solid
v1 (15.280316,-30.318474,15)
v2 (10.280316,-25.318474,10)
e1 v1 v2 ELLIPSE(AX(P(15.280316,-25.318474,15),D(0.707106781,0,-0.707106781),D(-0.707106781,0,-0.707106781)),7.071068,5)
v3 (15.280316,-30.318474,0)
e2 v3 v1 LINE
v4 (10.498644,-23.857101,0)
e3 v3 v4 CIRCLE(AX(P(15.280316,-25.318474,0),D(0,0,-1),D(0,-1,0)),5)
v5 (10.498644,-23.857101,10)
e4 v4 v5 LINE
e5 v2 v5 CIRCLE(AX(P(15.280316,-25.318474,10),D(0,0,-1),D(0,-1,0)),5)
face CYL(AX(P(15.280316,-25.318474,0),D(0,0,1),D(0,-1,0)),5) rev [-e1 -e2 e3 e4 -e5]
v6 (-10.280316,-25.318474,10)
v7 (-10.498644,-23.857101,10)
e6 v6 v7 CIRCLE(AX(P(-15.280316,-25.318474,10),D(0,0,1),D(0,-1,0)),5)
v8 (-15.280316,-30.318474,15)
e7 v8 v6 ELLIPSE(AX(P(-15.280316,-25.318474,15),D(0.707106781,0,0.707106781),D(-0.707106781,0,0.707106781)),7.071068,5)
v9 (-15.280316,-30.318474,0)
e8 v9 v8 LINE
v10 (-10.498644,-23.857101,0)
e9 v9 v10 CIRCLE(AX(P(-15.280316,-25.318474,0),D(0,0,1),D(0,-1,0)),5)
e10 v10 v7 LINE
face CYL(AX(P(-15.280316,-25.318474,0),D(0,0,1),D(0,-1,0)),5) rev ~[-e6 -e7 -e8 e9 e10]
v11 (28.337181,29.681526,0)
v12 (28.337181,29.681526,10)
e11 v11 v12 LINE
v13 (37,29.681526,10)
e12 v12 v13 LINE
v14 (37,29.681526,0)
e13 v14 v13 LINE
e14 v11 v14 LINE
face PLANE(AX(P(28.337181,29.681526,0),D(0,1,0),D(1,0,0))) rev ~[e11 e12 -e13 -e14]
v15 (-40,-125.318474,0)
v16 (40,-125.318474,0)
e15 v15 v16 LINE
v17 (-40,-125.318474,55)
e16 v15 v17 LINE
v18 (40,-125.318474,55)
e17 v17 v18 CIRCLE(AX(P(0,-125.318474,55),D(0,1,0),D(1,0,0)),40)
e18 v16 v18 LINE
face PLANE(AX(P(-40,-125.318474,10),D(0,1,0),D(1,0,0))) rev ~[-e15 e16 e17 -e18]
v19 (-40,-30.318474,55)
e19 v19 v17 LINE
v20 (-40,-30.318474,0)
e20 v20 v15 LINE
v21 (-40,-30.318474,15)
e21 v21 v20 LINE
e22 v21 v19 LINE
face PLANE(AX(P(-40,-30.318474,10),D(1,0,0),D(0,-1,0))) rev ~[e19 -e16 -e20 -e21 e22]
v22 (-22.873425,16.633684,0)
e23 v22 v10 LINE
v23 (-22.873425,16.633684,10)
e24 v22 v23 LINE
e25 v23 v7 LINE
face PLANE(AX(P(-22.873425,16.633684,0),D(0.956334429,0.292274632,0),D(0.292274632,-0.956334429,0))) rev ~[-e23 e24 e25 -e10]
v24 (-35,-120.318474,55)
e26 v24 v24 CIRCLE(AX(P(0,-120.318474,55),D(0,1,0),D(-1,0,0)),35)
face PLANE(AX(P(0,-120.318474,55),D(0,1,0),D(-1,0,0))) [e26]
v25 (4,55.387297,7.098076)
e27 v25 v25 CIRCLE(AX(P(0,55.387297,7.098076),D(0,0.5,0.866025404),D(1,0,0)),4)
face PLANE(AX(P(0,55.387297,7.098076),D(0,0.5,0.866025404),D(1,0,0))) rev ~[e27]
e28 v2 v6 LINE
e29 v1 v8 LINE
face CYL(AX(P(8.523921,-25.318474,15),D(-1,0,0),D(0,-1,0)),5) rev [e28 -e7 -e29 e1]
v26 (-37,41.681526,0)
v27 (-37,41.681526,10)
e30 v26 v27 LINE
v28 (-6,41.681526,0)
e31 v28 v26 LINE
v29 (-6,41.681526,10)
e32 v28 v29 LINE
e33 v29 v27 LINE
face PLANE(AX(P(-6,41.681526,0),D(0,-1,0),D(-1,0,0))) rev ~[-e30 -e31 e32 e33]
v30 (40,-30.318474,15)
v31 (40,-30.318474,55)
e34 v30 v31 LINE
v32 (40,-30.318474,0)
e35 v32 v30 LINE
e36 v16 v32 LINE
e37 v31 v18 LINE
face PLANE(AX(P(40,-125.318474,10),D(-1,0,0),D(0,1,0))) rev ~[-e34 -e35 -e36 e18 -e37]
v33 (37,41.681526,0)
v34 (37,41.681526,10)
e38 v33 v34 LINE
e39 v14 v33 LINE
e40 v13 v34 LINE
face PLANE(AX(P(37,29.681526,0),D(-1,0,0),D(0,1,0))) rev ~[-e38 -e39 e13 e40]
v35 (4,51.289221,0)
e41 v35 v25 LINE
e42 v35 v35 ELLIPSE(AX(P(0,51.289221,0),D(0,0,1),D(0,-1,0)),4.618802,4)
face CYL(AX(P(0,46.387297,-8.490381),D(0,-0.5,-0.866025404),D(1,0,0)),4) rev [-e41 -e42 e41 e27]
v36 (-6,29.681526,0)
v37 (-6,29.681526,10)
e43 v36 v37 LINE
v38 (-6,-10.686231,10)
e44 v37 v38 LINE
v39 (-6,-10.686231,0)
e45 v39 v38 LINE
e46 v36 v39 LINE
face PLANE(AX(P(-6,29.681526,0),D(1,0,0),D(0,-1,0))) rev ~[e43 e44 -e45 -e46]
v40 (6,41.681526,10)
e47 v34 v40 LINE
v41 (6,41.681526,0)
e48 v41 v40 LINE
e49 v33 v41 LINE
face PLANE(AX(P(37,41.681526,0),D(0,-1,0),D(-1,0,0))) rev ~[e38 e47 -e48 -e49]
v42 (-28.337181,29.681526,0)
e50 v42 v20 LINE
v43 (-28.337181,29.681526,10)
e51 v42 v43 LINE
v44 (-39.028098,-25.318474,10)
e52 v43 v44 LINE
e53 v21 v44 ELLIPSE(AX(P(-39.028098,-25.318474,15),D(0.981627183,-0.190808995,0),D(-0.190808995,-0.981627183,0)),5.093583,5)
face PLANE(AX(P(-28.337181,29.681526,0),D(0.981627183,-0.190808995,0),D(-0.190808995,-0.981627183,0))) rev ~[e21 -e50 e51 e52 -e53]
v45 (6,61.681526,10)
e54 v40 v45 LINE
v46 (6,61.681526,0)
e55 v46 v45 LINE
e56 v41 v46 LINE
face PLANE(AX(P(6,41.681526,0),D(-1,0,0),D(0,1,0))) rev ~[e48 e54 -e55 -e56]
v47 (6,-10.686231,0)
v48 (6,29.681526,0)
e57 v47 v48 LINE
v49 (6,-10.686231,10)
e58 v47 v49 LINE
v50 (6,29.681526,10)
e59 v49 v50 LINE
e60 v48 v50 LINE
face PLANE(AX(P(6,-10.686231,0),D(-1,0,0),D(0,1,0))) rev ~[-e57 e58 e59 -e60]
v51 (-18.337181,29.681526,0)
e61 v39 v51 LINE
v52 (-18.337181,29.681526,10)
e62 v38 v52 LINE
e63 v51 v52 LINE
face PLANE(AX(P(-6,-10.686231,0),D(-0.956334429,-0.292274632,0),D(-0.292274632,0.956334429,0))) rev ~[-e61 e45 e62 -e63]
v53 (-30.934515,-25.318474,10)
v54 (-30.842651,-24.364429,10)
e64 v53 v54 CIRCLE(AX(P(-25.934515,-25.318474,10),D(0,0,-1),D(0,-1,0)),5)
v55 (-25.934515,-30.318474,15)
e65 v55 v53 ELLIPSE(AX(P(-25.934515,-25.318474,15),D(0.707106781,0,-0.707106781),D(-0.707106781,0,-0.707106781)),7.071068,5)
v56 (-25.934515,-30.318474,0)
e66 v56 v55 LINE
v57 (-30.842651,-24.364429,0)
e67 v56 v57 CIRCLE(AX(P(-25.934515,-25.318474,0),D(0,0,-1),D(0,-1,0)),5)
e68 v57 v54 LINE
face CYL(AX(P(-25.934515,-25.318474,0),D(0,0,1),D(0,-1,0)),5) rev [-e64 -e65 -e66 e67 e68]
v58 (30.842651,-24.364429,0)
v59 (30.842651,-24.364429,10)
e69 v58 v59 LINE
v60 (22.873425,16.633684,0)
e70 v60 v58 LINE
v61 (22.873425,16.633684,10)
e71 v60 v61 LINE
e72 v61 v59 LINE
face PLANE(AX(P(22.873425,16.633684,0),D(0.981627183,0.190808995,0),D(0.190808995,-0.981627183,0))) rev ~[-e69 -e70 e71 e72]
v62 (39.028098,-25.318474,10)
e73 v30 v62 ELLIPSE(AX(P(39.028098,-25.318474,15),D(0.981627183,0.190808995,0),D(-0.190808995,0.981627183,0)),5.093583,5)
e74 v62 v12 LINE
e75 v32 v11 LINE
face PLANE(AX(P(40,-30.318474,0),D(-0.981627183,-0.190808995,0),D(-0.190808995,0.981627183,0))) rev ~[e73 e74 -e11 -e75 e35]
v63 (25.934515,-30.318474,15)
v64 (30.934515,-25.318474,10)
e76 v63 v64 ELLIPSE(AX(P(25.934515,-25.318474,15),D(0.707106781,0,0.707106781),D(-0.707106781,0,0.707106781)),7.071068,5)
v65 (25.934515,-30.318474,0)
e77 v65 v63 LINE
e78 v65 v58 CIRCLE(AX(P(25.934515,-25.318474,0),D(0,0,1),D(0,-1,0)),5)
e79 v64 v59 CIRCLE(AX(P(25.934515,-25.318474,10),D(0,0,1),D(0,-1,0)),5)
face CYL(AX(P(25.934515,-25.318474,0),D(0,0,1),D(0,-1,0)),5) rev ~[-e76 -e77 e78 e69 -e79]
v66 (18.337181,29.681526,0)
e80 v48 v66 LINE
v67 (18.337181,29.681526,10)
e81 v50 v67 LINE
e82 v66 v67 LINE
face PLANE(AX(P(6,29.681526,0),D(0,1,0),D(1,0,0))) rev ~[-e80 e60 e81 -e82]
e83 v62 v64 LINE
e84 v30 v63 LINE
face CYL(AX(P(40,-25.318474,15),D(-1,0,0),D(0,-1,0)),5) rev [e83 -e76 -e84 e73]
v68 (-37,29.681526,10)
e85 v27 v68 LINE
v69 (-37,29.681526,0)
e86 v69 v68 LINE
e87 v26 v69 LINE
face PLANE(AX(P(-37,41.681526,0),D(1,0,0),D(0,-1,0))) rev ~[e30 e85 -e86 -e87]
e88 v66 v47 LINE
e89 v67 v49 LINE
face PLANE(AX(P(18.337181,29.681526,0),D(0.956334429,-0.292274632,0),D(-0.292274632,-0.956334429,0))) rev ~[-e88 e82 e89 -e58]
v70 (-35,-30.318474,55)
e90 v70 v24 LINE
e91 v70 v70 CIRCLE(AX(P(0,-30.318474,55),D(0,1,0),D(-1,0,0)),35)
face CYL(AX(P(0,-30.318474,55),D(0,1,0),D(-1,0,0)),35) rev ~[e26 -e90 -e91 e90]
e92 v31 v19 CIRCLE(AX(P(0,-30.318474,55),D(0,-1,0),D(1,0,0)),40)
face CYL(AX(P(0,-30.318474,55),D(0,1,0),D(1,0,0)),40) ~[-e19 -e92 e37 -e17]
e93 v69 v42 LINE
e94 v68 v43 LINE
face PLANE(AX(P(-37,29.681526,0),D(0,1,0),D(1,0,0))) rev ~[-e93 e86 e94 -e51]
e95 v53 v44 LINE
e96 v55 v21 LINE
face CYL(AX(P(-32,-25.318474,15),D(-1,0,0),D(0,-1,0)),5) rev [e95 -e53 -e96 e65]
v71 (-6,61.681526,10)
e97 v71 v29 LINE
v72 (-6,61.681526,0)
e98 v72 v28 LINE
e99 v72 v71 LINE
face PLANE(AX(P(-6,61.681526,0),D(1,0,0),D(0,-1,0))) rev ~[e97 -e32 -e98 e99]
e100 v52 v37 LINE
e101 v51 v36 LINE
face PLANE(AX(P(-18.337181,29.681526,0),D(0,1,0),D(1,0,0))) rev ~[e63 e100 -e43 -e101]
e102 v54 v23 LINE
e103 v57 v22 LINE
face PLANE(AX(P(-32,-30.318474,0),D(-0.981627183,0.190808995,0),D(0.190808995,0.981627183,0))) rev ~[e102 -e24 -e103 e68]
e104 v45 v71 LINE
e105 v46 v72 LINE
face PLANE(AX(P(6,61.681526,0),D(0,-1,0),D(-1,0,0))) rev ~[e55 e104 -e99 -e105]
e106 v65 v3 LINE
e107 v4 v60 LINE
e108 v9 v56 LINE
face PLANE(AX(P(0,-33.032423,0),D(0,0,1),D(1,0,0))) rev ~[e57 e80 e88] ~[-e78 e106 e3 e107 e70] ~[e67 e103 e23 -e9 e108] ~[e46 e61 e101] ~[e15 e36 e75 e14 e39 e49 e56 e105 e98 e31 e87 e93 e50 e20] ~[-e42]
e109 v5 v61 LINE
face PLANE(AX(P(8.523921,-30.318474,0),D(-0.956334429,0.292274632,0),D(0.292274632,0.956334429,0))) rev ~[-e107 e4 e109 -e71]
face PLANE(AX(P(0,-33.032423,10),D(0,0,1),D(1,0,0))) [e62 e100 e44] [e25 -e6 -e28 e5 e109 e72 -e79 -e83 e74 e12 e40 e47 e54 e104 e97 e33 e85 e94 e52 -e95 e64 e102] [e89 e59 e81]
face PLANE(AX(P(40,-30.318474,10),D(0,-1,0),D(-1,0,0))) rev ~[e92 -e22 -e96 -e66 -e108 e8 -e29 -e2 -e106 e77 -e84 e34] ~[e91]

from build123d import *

# Parameters (mm, degrees)
F1_DEPTH  = 10
F3_DEPTH  = 100
F4_R      = 35
F5_DEPTH  = 90
F6_DEPTH  = 95.001
F7_R      = 5
F10_R     = 4
F11_DEPTH = 18


with BuildPart() as f1:
    # F0 (on Top) → F1 (new body)
    with BuildSketch(Plane.XY):
        Polygon((-6, 61.6815258077), (-6, 41.6815258077), (-37, 41.6815258077), (-37, 29.6815258077), (-28.3371814517, 29.6815258077), (-40, -30.3184741923), (-40, -125.3184741923), (0, -125.3184741923), (40, -125.3184741923), (40, -30.3184741923), (28.3371814517, 29.6815258077), (37, 29.6815258077), (37, 41.6815258077), (6, 41.6815258077), (6, 61.6815258077), (0, 61.6815258077), align=None)
        Polygon((-8.5239209836, -30.3184741923), (-32, -30.3184741923), (-22.8734250069, 16.6336838404), align=None, mode=Mode.SUBTRACT)
        Polygon((-18.3371814517, 29.6815258077), (-6, 29.6815258077), (-6, -10.686231312), align=None, mode=Mode.SUBTRACT)
        Polygon((6, -10.686231312), (6, 29.6815258077), (18.3371814517, 29.6815258077), align=None, mode=Mode.SUBTRACT)
        Polygon((22.8734250069, 16.6336838404), (32, -30.3184741923), (8.5239209836, -30.3184741923), align=None, mode=Mode.SUBTRACT)
    extrude(amount=F1_DEPTH)

    # F2 (on face) → F3 (join)
    with BuildSketch(Plane.XY.offset(10)):
        Polygon((-8.5239209836, -30.3184741923), (-40, -30.3184741923), (-40, -125.3184741923), (40, -125.3184741923), (40, -30.3184741923), (8.5239209836, -30.3184741923), align=None)
    extrude(amount=F3_DEPTH)

    # F4 (on face) → F5 (cut)
    with BuildSketch(Plane(origin=(0, -30.3184741923, 0), x_dir=(-1, 0, 0), z_dir=(0, 1, 0))):
        with Locations((0, 55)):
            Circle(F4_R)
    extrude(amount=-F5_DEPTH, mode=Mode.SUBTRACT)

    # F4 (on face) → F6 (cut, through all)
    with BuildSketch(Plane(origin=(0, -30.3184741923, 0), x_dir=(-1, 0, 0), z_dir=(0, 1, 0))):
        with BuildLine():
            ThreePointArc((-40, 55), (0, 95), (40, 55))
            Line((40, 55), (40, 110))
            Line((40, 110), (-40, 110))
            Line((-40, 110), (-40, 55))
        make_face()
    extrude(amount=-F6_DEPTH, mode=Mode.SUBTRACT)

    # F7
    f7_edges = [f1.edges().sort_by_distance(p)[0] for p in [
        (0, -30.318474, 10),
        (-8.523921, -30.318474, 5),
        (8.523921, -30.318474, 5),
        (36, -30.318474, 10),
        (32, -30.318474, 5),
        (-36, -30.318474, 10),
        (-32, -30.318474, 5),
    ]]
    fillet(f7_edges, radius=F7_R)

    # F10 (on face) → F11 (cut)
    with BuildSketch(Plane(origin=(0, 7.9203814519, 13.7185030901), x_dir=(1, 0, 0), z_dir=(0, 0.5, 0.8660254038))):
        with Locations((0, 44.4177682936)):
            Circle(F10_R)
    extrude(amount=F11_DEPTH, mode=Mode.SUBTRACT)


solid = f1.part
